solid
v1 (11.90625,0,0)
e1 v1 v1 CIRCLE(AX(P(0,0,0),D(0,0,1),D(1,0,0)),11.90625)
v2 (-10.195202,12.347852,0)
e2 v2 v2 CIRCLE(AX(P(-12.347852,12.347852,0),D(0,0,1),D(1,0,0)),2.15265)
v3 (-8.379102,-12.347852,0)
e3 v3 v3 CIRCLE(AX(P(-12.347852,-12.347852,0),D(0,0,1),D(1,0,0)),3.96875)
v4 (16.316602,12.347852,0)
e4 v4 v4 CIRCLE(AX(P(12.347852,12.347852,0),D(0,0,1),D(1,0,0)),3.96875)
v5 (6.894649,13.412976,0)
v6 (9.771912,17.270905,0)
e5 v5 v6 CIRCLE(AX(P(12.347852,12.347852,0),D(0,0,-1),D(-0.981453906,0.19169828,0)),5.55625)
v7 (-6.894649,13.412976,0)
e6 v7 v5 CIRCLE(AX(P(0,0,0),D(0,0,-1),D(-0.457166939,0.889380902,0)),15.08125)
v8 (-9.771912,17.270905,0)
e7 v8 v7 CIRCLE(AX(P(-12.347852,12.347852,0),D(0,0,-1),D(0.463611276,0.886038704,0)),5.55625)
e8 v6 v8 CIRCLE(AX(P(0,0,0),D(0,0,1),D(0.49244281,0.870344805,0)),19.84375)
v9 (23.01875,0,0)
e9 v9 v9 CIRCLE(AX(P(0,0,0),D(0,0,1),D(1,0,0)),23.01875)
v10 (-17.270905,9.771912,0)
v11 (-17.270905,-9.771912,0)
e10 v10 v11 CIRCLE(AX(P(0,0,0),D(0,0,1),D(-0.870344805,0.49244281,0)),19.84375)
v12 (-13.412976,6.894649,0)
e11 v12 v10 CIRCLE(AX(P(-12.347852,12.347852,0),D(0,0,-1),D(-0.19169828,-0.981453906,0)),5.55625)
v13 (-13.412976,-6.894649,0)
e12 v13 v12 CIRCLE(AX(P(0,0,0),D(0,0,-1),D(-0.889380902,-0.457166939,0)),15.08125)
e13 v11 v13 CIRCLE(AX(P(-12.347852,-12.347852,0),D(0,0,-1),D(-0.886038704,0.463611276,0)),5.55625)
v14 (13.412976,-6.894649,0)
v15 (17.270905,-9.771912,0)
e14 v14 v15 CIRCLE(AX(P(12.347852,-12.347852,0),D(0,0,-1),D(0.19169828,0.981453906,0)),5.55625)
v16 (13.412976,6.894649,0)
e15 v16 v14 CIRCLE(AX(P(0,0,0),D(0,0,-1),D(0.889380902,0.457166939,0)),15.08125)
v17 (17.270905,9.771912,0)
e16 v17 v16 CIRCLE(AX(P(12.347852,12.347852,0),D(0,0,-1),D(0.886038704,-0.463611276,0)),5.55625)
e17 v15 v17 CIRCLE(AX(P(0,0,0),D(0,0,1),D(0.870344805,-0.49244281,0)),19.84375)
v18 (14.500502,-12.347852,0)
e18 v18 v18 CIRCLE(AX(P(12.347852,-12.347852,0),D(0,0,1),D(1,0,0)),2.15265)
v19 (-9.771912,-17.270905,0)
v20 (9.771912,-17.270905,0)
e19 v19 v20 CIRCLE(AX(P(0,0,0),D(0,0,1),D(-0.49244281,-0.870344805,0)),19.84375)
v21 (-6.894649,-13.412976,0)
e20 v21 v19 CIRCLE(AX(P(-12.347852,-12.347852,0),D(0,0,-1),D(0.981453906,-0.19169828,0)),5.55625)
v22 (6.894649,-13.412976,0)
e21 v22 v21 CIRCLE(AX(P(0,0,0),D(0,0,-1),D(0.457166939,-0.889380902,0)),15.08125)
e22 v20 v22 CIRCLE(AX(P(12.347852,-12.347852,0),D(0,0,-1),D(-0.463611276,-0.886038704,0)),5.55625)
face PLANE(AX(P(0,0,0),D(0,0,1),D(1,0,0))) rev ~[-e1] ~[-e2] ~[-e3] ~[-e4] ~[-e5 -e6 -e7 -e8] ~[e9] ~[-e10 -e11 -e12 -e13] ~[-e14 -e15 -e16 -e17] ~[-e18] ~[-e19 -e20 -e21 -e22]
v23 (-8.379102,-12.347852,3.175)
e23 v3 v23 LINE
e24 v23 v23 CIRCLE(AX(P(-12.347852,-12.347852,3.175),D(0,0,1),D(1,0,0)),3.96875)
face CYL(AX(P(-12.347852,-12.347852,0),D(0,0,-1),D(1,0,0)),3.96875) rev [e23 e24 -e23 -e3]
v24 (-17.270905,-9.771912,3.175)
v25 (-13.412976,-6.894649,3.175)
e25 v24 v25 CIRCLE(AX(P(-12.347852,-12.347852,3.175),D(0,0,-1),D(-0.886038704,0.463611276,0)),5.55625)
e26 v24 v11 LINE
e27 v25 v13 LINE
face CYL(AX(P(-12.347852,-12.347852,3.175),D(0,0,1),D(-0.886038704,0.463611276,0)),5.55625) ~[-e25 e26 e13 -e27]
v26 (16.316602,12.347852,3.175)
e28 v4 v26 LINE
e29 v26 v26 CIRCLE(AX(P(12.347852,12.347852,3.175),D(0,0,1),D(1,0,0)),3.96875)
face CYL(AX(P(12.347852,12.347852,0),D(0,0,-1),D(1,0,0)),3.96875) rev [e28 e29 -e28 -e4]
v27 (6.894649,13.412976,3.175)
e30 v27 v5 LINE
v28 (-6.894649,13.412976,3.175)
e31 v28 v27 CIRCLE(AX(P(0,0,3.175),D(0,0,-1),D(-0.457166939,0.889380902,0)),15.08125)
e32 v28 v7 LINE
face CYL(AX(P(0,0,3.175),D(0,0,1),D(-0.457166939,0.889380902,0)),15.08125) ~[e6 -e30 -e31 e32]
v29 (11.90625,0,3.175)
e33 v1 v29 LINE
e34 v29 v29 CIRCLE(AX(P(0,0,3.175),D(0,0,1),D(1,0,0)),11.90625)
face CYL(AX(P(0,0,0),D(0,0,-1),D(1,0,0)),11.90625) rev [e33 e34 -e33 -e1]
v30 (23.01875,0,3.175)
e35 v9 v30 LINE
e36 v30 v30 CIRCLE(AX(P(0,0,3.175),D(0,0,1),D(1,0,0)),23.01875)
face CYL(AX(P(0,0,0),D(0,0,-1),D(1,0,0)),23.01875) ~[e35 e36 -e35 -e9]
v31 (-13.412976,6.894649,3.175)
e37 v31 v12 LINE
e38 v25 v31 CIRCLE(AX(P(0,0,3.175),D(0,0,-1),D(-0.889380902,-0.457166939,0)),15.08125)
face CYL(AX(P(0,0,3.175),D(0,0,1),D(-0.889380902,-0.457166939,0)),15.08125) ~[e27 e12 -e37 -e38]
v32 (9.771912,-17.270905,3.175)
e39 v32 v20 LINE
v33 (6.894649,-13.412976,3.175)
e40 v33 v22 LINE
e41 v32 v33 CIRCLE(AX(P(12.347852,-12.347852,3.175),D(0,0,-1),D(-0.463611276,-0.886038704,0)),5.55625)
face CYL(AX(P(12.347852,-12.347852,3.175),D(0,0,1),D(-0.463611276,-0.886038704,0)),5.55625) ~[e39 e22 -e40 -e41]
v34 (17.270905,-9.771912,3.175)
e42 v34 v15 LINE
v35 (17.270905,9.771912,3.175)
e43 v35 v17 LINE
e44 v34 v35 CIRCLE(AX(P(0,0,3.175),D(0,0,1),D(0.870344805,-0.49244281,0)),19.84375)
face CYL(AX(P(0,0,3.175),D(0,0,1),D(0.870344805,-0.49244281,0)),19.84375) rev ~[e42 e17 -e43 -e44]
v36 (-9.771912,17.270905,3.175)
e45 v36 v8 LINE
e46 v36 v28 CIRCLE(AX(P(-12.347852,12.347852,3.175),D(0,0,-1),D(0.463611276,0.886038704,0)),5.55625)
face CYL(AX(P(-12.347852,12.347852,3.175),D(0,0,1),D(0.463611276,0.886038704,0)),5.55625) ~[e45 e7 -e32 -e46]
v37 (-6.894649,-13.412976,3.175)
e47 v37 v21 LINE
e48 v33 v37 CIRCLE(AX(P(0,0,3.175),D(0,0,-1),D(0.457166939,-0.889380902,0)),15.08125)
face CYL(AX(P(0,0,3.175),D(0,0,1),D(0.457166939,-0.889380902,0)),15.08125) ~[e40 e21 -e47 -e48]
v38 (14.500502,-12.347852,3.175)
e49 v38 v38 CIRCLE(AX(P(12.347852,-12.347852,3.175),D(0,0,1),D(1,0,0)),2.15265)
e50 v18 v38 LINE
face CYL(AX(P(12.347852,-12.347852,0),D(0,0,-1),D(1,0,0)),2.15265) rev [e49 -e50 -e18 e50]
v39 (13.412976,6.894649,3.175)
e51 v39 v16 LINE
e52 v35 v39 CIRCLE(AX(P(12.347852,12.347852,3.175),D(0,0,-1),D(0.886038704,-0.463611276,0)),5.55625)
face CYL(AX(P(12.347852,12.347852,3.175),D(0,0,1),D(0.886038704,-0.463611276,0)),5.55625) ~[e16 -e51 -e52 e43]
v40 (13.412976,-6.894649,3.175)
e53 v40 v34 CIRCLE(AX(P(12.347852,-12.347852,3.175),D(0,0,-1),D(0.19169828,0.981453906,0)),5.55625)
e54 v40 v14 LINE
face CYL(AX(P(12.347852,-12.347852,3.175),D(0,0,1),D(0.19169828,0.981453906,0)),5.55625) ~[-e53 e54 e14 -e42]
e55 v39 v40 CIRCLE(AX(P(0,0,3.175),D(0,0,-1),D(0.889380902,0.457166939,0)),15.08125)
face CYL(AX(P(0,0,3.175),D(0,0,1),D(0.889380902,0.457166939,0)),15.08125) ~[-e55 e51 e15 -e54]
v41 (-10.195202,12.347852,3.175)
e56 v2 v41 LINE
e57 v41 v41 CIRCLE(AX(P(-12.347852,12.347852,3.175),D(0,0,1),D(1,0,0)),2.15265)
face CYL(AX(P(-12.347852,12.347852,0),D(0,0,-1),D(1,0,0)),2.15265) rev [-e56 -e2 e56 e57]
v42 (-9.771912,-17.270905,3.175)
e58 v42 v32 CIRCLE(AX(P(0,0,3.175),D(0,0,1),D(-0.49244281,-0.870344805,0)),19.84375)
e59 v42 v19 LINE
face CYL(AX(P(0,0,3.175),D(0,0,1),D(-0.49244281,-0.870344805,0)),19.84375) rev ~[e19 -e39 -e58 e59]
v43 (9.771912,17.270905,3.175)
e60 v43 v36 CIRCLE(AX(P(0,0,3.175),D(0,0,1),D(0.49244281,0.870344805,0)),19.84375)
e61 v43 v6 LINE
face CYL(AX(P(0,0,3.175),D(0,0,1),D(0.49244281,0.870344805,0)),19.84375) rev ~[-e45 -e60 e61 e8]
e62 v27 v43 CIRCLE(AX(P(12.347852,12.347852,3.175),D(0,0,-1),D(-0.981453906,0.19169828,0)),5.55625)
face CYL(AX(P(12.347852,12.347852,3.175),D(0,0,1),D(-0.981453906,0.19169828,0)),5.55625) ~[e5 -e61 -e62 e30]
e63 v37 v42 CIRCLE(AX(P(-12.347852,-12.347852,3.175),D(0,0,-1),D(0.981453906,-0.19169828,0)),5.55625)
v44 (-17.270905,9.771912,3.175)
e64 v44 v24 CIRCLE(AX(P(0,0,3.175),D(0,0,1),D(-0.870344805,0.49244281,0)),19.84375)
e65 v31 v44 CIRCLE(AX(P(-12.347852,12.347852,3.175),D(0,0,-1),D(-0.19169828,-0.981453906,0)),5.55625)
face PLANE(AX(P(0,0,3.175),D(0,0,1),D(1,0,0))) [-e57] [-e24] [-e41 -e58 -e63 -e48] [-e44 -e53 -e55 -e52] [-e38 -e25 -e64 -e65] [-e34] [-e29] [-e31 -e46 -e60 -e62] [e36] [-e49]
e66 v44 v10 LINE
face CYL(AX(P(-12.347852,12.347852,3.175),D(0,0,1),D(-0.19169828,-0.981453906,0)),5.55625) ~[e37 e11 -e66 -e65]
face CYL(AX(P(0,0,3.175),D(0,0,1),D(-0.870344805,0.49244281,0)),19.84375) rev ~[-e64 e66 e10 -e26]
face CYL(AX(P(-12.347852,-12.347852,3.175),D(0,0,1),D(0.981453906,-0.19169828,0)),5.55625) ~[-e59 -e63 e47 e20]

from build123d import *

# Parameters (mm, degrees)
F0_R            = 23.01875
F0_R_2          = 3.96875
F0_R_3          = 2.15265
F0_R_4          = 11.90625
F1_DEPTH        = 3.175
F3_DEPTH        = 3.175
F3_COPIES_COUNT = 4


# Not quite as in the source:
# - a pattern or mirror of a feature is missing from the dataset's text; its kind, count and spacing are read off the source's solid


with BuildPart() as f1:
    # F0 (on Top) → F1 (new body)
    with BuildSketch(Plane.XY):
        Circle(F0_R)
        with Locations((-12.3478521665, -12.3478521665)):
            Circle(F0_R_2, mode=Mode.SUBTRACT)
        with Locations((12.3478521665, -12.3478521665)):
            Circle(F0_R_3, mode=Mode.SUBTRACT)
        with Locations((-12.3478521665, 12.3478521665)):
            Circle(F0_R_3, mode=Mode.SUBTRACT)
        Circle(F0_R_4, mode=Mode.SUBTRACT)
        with Locations((12.3478521665, 12.3478521665)):
            Circle(F0_R_2, mode=Mode.SUBTRACT)
    extrude(amount=F1_DEPTH)

    # F2 (on face) → F3 (cut, through all)
    with BuildSketch(Plane.XY.offset(3.175)):
        with BuildLine():
            ThreePointArc((-6.8946489019, 13.4129757356), (0, 15.08125), (6.8946489019, 13.4129757356))
            ThreePointArc((6.8946489019, 13.4129757356), (7.8938999882, 15.6696324205), (9.7719120136, 17.2709047146))
            ThreePointArc((9.7719120136, 17.2709047146), (0, 19.84375), (-9.7719120136, 17.2709047146))
            ThreePointArc((-9.7719120136, 17.2709047146), (-7.8938999882, 15.6696324205), (-6.8946489019, 13.4129757356))
        make_face()
    f3 = extrude(amount=-F3_DEPTH, mode=Mode.SUBTRACT)

    # F3_copies: F3 ×4 about axis
    f3_copies_axis = Axis((0, 0, 0), (0, 0, 1))
    for i in range(1, F3_COPIES_COUNT):
        add(f3.rotate(f3_copies_axis, i * 360 / F3_COPIES_COUNT), mode=Mode.SUBTRACT)


solid = f1.part
